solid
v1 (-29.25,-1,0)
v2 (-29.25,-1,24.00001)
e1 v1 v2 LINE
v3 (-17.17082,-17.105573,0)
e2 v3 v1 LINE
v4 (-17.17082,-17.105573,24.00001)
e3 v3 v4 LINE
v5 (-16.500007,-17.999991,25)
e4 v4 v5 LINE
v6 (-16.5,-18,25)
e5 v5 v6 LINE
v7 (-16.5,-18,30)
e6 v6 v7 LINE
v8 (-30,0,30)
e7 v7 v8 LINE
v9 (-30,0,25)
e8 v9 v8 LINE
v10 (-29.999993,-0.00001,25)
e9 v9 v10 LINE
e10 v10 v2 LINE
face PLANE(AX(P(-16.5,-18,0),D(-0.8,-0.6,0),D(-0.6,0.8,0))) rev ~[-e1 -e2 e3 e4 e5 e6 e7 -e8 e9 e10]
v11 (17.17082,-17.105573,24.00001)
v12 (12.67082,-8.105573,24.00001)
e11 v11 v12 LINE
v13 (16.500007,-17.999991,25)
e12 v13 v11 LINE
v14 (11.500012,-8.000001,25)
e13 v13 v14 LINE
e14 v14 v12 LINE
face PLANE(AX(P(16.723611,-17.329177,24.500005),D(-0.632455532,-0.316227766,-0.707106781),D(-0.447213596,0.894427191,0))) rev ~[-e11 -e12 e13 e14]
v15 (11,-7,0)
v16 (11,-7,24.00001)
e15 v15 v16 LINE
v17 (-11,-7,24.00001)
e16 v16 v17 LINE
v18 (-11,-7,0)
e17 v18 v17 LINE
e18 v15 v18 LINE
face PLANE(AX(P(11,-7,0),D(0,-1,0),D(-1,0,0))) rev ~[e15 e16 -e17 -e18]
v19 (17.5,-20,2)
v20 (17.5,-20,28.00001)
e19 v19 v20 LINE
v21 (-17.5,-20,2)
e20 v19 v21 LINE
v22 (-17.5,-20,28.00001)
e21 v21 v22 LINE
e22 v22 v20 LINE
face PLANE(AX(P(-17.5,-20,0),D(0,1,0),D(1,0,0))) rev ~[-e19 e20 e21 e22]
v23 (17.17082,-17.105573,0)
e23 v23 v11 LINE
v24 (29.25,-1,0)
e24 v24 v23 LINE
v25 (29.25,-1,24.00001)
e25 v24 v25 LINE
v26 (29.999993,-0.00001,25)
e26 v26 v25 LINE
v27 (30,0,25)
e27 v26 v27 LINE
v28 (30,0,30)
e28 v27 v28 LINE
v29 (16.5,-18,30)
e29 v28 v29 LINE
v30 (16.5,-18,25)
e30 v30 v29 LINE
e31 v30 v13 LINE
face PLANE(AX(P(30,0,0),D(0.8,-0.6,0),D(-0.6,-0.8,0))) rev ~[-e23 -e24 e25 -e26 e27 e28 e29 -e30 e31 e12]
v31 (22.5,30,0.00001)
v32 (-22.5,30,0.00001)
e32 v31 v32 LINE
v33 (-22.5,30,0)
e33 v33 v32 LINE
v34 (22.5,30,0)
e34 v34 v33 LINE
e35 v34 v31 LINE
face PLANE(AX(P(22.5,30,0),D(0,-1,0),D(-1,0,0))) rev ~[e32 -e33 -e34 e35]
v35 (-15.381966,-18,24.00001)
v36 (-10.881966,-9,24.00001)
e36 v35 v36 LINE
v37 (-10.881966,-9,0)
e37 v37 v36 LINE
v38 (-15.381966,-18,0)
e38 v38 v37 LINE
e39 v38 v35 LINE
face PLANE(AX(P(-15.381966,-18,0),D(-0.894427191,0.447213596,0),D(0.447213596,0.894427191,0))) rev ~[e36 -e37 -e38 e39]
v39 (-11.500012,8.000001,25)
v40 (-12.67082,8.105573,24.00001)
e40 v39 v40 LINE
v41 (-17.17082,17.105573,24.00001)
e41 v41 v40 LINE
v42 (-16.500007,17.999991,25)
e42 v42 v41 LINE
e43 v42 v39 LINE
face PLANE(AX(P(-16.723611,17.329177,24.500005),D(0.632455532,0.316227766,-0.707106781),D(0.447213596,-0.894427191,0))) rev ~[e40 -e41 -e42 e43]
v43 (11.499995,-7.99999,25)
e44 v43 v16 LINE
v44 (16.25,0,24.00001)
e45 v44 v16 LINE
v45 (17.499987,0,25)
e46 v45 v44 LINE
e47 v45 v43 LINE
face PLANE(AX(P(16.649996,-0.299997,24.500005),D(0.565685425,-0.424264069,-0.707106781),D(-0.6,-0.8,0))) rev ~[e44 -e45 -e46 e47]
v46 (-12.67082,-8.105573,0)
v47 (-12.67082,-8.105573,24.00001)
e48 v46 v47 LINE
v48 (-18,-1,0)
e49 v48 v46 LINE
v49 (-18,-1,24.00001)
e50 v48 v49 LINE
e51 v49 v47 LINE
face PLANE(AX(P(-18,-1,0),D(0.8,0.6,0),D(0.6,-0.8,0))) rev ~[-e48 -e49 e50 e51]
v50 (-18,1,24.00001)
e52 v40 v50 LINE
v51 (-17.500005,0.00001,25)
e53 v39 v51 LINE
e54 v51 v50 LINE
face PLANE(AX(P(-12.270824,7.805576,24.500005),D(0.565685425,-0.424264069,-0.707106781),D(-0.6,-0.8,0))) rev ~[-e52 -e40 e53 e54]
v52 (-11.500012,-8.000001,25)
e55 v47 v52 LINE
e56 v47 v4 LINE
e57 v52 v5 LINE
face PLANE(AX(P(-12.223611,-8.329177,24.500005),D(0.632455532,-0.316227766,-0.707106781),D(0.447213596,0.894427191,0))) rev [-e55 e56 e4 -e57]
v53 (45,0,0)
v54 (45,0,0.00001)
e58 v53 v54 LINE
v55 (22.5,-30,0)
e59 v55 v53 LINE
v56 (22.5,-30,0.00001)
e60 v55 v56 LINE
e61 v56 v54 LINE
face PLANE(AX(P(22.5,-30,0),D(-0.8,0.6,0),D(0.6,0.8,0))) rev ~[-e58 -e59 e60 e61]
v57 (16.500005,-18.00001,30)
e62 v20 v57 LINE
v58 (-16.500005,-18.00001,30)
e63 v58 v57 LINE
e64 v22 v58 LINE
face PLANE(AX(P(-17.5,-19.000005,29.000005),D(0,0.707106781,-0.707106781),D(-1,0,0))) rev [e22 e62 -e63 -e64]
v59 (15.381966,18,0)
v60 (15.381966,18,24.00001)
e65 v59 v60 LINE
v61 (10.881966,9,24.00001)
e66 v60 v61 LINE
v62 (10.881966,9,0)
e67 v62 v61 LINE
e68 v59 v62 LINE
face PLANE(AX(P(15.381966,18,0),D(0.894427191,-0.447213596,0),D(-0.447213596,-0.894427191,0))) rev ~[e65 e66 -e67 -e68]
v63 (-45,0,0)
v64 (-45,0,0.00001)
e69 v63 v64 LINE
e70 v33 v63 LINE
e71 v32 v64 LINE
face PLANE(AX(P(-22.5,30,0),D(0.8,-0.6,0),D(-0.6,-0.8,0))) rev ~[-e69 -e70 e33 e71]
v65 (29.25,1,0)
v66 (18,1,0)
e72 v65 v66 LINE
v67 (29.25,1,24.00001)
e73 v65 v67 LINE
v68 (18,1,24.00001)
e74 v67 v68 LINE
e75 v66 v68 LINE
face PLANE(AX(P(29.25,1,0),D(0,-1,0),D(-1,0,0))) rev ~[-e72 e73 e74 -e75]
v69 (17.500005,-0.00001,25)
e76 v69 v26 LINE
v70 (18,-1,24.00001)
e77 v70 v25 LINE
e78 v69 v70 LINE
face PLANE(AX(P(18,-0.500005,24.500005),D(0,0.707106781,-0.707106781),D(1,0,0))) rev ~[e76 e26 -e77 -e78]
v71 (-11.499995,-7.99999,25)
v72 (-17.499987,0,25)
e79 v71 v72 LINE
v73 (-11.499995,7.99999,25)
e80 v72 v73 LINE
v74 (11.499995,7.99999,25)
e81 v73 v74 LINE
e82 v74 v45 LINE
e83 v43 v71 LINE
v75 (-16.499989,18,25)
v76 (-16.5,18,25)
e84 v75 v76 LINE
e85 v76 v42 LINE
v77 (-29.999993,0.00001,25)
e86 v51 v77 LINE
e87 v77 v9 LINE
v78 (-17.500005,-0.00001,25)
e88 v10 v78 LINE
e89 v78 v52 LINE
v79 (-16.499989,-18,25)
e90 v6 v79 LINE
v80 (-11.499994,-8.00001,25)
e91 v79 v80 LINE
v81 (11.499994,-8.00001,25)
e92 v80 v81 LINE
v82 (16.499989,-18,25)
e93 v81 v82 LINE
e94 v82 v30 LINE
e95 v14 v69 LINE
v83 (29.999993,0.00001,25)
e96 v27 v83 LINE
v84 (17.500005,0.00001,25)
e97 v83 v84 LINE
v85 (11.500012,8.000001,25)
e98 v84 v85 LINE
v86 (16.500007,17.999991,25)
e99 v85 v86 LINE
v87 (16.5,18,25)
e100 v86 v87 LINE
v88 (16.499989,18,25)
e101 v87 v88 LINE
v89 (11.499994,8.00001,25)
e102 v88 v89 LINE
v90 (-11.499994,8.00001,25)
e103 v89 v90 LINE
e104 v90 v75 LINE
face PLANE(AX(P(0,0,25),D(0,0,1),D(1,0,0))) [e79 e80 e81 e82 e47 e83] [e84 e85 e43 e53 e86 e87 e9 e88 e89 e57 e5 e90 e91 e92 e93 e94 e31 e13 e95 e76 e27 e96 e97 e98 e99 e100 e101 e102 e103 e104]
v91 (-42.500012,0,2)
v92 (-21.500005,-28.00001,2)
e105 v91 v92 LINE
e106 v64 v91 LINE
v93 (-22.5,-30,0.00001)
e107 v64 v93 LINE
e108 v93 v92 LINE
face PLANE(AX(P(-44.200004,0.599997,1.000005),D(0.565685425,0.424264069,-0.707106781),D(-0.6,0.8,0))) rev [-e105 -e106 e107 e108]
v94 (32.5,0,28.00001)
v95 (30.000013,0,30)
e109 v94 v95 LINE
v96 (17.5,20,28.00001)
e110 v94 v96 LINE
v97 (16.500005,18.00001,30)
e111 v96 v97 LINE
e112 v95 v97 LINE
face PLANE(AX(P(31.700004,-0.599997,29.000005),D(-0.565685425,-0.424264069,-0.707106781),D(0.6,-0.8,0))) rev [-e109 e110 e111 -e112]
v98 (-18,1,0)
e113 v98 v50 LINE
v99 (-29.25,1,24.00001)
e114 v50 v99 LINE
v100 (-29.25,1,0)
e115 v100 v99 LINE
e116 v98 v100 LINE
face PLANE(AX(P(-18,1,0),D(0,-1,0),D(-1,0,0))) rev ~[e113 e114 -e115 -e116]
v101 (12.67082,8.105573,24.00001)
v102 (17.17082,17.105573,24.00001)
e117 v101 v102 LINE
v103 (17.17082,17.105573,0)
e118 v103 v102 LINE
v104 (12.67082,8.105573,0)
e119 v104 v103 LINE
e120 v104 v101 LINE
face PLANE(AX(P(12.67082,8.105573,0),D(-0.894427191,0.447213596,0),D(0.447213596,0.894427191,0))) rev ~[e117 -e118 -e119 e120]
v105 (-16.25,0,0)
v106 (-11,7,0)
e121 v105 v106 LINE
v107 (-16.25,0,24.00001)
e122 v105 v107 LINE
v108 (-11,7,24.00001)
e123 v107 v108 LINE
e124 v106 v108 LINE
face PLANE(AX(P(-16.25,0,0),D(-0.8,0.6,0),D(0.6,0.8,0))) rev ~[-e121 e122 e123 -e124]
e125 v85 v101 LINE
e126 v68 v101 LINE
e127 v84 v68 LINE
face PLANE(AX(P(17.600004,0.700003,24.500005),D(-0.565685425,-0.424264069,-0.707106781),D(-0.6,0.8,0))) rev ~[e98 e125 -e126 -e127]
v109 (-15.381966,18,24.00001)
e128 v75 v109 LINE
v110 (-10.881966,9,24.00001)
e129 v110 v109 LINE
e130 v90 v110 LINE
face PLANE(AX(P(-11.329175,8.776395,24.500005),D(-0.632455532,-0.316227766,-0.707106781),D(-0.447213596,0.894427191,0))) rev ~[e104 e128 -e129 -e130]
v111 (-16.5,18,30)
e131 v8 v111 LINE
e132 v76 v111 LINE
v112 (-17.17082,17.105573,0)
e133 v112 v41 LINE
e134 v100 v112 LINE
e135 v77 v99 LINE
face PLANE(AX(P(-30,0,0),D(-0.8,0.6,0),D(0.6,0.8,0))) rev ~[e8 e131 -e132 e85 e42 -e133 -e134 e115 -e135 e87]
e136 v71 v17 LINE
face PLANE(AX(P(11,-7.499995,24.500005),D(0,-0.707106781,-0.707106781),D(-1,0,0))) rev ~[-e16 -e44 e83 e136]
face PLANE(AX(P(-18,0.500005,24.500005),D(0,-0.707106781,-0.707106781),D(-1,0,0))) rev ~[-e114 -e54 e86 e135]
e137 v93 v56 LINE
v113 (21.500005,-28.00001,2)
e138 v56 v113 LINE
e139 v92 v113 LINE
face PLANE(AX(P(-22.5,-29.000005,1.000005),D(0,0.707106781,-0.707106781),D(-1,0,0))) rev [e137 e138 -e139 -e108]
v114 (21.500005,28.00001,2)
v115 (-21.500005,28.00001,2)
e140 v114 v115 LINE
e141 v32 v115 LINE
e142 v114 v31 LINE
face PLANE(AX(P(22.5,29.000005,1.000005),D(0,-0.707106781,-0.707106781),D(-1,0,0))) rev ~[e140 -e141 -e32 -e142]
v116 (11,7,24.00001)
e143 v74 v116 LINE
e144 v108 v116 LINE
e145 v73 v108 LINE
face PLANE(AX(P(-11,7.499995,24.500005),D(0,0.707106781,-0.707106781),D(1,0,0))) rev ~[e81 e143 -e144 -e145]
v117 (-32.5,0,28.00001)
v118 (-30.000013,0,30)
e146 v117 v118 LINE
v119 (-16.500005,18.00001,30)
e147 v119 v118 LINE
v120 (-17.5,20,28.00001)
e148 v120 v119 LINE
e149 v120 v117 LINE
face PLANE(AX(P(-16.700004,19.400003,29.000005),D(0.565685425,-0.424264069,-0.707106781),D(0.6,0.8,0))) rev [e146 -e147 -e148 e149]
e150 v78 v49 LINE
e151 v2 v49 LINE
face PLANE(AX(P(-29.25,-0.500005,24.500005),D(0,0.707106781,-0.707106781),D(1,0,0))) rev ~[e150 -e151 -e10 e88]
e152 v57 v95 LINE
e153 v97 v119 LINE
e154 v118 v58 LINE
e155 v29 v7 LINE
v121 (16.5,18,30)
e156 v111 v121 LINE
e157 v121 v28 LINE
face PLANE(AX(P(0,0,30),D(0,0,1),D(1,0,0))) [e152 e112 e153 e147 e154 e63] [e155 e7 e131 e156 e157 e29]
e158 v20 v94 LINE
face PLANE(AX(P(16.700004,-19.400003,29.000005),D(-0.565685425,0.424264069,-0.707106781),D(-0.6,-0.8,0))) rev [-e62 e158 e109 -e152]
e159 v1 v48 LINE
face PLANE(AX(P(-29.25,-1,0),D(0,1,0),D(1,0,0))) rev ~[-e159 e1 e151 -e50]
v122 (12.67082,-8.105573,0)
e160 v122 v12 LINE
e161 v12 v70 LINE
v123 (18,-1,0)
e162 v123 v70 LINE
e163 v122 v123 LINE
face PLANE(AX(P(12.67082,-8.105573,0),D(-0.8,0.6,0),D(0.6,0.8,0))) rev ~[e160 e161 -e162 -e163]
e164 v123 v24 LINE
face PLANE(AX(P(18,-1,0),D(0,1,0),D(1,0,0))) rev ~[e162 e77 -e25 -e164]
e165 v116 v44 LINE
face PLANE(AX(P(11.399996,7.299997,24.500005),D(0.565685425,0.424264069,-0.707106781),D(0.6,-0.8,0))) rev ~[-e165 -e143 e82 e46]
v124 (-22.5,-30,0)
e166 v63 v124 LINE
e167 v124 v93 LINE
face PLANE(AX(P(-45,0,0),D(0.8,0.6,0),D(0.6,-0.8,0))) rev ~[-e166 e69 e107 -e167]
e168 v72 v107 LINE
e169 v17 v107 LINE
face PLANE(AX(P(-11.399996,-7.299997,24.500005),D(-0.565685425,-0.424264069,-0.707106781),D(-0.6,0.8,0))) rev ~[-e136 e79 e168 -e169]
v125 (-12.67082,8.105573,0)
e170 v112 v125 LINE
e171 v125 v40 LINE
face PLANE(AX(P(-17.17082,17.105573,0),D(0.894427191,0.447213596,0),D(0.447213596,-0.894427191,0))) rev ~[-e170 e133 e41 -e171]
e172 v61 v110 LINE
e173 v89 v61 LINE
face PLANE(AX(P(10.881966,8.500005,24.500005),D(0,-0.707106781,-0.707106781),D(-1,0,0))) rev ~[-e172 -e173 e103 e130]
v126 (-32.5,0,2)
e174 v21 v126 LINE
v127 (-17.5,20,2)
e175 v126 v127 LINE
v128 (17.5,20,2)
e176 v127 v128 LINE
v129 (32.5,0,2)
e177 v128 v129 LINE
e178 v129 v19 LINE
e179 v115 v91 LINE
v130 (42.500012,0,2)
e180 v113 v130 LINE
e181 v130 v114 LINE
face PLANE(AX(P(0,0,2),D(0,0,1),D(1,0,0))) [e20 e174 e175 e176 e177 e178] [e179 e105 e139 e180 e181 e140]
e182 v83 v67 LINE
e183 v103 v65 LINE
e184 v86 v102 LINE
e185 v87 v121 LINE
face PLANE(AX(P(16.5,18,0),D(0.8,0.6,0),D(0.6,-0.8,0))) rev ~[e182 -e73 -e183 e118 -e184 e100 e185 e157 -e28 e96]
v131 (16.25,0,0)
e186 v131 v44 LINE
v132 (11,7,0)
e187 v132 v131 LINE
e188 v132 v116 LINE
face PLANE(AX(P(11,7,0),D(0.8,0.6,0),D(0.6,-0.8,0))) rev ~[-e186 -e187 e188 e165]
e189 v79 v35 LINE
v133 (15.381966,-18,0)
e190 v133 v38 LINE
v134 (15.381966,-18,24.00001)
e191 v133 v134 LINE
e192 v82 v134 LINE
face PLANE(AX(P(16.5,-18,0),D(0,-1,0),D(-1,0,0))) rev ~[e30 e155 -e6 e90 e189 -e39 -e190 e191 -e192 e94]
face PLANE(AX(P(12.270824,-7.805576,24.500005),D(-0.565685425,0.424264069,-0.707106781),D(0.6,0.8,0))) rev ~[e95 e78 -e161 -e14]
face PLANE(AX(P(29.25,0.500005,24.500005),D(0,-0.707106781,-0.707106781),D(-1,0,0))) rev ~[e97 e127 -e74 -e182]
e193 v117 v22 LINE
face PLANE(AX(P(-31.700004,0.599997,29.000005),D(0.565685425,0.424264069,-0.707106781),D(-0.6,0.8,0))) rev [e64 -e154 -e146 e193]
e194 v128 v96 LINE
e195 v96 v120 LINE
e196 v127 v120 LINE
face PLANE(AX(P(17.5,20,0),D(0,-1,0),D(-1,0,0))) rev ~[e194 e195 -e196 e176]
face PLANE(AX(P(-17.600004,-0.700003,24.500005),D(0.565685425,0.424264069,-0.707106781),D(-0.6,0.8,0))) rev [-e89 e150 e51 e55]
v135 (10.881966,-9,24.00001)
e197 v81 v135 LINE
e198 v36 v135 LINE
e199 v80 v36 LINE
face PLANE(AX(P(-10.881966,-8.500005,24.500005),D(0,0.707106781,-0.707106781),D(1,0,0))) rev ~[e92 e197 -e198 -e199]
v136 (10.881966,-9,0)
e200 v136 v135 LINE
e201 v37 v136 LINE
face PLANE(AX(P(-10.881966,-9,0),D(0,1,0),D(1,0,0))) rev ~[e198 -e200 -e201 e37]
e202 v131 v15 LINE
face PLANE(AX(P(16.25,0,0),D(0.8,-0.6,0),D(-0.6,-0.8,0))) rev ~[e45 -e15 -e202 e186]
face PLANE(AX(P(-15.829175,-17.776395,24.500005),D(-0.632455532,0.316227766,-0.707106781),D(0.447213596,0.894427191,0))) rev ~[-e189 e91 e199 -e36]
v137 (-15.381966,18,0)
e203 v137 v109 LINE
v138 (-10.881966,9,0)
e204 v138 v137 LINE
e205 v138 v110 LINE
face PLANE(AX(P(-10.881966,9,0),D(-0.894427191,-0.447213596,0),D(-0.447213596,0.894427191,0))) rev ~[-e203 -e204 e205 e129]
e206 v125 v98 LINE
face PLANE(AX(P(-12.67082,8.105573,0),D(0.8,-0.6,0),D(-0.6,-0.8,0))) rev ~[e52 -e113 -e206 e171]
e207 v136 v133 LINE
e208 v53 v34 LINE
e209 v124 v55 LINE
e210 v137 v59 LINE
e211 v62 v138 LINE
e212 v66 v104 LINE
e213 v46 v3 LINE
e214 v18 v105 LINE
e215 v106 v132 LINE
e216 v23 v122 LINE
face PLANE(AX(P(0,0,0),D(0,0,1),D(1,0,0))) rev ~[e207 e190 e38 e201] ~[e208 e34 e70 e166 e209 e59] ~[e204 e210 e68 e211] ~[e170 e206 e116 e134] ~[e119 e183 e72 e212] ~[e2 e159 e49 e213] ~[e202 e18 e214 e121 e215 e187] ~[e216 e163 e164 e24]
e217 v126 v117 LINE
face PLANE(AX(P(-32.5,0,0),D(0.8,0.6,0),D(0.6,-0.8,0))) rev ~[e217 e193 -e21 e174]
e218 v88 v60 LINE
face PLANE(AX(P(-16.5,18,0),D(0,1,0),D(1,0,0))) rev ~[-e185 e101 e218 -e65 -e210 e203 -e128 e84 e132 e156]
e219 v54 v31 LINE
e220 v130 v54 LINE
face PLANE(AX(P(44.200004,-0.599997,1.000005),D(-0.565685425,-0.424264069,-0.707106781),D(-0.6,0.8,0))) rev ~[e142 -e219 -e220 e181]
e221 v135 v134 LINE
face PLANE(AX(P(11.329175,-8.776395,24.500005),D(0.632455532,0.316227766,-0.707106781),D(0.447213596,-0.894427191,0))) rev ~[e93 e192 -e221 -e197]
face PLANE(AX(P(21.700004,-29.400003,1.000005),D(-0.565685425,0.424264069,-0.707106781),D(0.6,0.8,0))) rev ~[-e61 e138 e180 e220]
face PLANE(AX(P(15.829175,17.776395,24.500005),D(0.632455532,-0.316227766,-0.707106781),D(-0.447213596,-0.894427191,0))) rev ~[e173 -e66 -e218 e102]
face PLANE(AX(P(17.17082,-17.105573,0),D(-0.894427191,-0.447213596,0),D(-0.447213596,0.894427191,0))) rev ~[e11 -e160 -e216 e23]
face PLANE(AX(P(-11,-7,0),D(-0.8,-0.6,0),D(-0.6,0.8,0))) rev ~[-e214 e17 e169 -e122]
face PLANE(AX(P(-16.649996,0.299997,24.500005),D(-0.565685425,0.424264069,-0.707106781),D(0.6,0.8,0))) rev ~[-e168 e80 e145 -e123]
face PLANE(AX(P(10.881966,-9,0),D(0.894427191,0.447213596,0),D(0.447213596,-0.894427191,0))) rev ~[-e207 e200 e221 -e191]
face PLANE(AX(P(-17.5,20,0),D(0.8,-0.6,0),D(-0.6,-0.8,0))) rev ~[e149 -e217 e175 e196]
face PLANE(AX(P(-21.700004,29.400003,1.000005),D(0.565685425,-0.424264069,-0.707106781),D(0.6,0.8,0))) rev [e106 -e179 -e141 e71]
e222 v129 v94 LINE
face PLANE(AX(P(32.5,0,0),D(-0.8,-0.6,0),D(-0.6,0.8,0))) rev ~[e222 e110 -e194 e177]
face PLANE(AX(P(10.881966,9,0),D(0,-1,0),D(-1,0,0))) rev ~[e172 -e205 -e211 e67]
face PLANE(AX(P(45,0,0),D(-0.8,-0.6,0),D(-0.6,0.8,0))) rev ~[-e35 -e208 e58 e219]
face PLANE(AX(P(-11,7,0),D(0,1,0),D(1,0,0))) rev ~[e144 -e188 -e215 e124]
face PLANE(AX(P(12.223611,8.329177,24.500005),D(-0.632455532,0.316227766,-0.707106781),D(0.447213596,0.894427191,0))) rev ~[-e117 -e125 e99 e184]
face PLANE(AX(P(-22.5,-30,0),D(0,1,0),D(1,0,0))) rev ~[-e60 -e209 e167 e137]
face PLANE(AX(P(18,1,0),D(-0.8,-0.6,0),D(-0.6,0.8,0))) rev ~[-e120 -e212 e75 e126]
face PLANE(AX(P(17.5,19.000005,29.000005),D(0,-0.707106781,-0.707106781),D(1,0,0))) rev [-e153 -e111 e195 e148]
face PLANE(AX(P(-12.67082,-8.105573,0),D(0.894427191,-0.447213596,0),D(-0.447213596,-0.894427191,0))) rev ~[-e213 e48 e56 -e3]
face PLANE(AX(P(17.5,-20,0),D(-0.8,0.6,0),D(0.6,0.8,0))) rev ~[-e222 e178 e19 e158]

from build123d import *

# Parameters (mm, degrees)
F1_DEPTH = 30
F2_DEPTH = 2
F3_SIZE  = 1.99999
F5_DEPTH = 25
F6_SIZE  = 0.99999


# Not quite as in the source:
# - a fillet or chamfer is up to 0.001 mm smaller than in the source, because OpenCascade refuses the exact size


with BuildPart() as f1:
    # F0 (on Top) → F1 (new body)
    with BuildSketch(Plane.XY):
        Polygon((17.5, 20), (-17.5, 20), (-32.5, 0), (-17.5, -20), (17.5, -20), (32.5, 0), align=None)
        Polygon((16.5, -18), (-16.5, -18), (-30, 0), (-16.5, 18), (16.5, 18), (30, 0), align=None, mode=Mode.SUBTRACT)
    extrude(amount=F1_DEPTH)

    # F0 (on Top) → F2 (join)
    with BuildSketch(Plane.XY):
        Polygon((-45, 0), (-22.5, -30), (22.5, -30), (45, 0), (22.5, 30), (-22.5, 30), align=None)
        Polygon((-32.5, 0), (-17.5, 20), (17.5, 20), (32.5, 0), (17.5, -20), (-17.5, -20), align=None, mode=Mode.SUBTRACT)
    extrude(amount=F2_DEPTH)

    # F3 (size 2 in the source; OpenCascade refuses exactly that, so slightly less here)
    f3_edges = [f1.edges().sort_by_distance(p)[0] for p in [
        (-25, 10, 30),
        (0, 20, 30),
        (25, 10, 30),
        (25, -10, 30),
        (0, -20, 30),
        (-25, -10, 30),
        (0, -30, 2),
        (33.75, -15, 2),
        (33.75, 15, 2),
        (-33.75, -15, 2),
        (-33.75, 15, 2),
        (0, 30, 2),
    ]]
    chamfer(f3_edges, length=F3_SIZE)

    # F4 (on Top) → F5 (join)
    with BuildSketch(Plane.XY):
        Polygon((-17.1708203932, -17.105572809), (-16.5, -18), (-15.3819660113, -18), (-10.8819660113, -9), (10.8819660113, -9), (15.3819660113, -18), (16.5, -18), (17.1708203932, -17.105572809), (12.6708203932, -8.105572809), (18, -1), (29.25, -1), (30, 0), (29.25, 1), (18, 1), (12.6708203932, 8.105572809), (17.1708203932, 17.105572809), (16.5, 18), (15.3819660113, 18), (10.8819660113, 9), (-10.8819660113, 9), (-15.3819660113, 18), (-16.5, 18), (-17.1708203932, 17.105572809), (-12.6708203932, 8.105572809), (-18, 1), (-29.25, 1), (-30, 0), (-29.25, -1), (-18, -1), (-12.6708203932, -8.105572809), align=None)
        Polygon((-11, -7), (-16.25, 0), (-11, 7), (11, 7), (16.25, 0), (11, -7), align=None, mode=Mode.SUBTRACT)
    extrude(amount=F5_DEPTH)

    # F6 (size 1 in the source; OpenCascade refuses exactly that, so slightly less here)
    f6_edges = [f1.edges().sort_by_distance(p)[0] for p in [
        (-23.625, -1, 25),
        (-23.625, 1, 25),
        (-15.33541, -4.552786, 25),
        (-13.625, -3.5, 25),
        (-13.625, 3.5, 25),
        (-15.33541, 4.552786, 25),
        (-14.92082, 12.605573, 25),
        (-13.131966, 13.5, 25),
        (0, 7, 25),
        (0, 9, 25),
        (0, -9, 25),
        (0, -7, 25),
        (-13.131966, -13.5, 25),
        (-14.92082, -12.605573, 25),
        (14.92082, -12.605573, 25),
        (13.131966, -13.5, 25),
        (15.33541, -4.552786, 25),
        (13.625, -3.5, 25),
        (23.625, -1, 25),
        (23.625, 1, 25),
        (15.33541, 4.552786, 25),
        (13.625, 3.5, 25),
        (14.92082, 12.605573, 25),
        (13.131966, 13.5, 25),
    ]]
    chamfer(f6_edges, length=F6_SIZE)


solid = f1.part
